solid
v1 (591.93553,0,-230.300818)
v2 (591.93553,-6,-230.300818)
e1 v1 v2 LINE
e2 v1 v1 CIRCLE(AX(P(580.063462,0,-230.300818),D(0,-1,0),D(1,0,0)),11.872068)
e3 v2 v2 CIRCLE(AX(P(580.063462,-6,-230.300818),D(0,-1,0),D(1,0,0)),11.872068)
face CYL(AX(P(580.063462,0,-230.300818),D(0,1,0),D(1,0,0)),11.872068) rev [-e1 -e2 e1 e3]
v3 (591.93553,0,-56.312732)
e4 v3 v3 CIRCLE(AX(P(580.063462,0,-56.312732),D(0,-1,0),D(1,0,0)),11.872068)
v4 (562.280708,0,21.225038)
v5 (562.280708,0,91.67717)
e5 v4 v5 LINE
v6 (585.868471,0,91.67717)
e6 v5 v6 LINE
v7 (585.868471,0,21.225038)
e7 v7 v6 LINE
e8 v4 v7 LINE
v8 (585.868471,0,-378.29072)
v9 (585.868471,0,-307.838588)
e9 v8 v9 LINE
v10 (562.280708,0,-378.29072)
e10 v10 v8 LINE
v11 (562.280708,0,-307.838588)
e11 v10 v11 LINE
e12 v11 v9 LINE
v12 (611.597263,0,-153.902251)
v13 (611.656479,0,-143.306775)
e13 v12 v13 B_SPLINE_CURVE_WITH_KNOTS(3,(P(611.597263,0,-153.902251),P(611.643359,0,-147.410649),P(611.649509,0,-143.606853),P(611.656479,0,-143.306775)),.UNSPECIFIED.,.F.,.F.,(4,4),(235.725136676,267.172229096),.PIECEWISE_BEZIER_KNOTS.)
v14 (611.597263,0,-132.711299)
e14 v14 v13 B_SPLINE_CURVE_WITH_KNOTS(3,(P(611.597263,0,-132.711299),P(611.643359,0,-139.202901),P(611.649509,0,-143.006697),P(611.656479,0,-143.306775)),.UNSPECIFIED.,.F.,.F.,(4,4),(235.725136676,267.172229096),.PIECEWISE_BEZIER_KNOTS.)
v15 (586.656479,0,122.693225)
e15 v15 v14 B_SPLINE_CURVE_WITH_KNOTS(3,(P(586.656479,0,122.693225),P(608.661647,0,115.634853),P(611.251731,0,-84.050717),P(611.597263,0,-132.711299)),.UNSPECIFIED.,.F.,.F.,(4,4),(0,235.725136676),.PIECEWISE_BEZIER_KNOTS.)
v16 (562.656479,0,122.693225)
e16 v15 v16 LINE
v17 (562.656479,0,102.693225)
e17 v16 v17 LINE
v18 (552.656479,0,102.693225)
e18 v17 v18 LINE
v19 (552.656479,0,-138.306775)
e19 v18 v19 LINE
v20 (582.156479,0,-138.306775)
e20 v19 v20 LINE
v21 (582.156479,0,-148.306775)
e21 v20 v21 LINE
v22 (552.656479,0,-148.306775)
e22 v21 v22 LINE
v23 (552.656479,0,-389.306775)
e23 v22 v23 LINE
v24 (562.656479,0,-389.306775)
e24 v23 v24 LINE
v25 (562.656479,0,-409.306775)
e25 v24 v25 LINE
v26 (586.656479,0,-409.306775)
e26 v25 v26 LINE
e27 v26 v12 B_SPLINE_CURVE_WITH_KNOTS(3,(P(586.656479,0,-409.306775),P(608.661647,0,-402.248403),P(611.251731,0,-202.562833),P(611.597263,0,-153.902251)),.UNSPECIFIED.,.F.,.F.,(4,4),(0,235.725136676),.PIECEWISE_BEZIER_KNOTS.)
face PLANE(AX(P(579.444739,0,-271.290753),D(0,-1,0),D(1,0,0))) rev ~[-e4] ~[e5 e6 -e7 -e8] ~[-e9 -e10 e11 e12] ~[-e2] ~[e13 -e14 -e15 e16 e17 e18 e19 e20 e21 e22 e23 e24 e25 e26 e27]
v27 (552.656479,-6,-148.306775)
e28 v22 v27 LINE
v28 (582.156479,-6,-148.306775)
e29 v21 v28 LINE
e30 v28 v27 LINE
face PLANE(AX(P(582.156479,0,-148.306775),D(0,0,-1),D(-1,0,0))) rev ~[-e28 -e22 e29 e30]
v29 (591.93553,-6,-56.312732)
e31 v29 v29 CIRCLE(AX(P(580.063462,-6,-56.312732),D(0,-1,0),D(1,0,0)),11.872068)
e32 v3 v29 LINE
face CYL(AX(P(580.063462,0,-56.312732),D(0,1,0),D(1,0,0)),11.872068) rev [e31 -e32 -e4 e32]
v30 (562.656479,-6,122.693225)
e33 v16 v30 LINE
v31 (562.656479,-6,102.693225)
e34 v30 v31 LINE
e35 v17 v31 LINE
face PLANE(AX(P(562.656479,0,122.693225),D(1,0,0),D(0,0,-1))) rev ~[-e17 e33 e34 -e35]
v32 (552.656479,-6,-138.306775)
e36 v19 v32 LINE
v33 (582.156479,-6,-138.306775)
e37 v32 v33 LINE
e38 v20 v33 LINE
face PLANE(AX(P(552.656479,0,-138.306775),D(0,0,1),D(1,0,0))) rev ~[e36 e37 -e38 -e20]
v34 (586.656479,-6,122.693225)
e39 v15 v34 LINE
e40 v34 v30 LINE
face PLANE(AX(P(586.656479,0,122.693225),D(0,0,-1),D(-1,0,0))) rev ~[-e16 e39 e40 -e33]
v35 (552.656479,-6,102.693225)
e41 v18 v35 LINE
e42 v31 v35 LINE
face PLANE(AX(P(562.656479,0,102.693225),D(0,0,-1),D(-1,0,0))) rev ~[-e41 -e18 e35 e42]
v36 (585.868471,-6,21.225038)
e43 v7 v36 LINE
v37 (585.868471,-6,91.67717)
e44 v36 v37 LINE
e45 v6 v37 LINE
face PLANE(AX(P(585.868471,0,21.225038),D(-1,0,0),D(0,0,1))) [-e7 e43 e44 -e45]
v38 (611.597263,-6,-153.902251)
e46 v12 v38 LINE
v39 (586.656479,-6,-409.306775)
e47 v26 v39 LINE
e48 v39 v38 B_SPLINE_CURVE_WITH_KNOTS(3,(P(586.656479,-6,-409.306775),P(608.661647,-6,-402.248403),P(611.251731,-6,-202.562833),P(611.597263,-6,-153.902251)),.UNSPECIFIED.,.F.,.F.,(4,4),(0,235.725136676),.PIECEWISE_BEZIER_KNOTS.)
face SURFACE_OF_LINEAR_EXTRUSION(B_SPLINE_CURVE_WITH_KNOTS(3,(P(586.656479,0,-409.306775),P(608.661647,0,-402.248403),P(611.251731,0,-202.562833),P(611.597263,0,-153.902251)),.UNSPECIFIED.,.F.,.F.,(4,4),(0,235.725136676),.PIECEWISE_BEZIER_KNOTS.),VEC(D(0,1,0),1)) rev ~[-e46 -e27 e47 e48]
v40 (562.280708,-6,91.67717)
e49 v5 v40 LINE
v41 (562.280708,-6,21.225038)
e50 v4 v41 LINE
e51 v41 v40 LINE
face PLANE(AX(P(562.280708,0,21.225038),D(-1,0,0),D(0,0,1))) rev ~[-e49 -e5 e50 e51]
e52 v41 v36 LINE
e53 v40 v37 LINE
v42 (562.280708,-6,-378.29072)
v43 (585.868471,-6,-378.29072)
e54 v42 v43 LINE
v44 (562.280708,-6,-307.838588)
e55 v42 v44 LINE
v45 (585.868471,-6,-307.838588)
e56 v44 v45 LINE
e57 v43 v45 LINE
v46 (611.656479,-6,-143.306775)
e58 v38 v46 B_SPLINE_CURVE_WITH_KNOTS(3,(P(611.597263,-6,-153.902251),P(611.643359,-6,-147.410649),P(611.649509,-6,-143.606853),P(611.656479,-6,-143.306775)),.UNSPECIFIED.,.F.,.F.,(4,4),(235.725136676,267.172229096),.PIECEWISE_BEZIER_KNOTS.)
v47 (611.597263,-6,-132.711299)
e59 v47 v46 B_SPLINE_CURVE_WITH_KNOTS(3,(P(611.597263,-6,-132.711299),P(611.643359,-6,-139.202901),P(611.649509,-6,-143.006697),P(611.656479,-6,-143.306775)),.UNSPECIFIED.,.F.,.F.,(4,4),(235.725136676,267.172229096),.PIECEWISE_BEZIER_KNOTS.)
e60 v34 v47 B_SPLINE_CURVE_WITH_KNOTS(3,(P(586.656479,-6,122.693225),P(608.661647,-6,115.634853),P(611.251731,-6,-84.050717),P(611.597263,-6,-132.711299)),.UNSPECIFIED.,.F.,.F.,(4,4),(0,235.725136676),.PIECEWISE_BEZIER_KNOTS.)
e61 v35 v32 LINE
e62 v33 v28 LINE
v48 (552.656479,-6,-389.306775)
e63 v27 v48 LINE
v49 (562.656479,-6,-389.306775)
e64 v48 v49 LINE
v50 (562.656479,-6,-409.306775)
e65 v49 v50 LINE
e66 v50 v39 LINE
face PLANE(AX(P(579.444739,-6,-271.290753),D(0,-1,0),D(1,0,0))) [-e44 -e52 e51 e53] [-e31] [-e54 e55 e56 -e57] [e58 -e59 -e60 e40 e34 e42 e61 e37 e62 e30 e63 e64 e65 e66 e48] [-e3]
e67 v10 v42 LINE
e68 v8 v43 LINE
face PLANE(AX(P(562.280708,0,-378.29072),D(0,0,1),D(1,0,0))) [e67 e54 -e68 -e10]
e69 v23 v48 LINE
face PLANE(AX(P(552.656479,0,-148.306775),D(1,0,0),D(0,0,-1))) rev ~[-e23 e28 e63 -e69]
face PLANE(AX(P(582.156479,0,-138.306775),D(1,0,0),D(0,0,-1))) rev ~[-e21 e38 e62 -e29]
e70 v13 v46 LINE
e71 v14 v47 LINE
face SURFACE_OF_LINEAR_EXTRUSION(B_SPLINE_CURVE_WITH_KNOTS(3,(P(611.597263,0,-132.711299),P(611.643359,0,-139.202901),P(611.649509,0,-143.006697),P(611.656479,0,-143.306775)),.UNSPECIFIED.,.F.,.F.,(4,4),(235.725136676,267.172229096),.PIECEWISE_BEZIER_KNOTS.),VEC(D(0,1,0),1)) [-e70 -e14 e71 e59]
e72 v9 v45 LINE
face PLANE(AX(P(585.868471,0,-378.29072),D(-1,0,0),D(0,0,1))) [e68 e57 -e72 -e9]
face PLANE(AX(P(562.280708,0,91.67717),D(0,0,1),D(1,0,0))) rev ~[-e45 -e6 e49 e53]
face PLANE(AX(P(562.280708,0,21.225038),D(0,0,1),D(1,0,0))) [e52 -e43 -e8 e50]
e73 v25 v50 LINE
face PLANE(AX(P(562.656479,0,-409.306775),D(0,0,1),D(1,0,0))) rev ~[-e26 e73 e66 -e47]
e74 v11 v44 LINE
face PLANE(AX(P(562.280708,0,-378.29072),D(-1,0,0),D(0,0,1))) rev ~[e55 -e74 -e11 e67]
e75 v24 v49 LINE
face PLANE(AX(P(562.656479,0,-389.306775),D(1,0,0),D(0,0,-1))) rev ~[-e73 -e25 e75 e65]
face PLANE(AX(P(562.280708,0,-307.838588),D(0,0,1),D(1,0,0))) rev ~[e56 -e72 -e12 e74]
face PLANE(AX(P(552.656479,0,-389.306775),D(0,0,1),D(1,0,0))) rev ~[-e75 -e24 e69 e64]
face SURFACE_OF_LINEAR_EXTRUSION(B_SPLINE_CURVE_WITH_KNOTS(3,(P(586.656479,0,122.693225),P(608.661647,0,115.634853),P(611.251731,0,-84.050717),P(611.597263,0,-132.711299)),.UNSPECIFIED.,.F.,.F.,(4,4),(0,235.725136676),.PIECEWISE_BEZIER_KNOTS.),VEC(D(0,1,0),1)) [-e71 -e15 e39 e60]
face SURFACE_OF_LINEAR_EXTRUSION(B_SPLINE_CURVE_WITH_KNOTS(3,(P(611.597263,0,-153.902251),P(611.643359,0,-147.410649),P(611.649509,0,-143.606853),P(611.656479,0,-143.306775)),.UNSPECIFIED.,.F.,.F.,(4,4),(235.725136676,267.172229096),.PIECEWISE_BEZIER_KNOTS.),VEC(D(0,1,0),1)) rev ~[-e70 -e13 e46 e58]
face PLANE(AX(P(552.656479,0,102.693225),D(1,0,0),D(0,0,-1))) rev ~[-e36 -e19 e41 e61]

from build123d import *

# Parameters (mm, degrees)
F0_W     = 23.5877633095
F0_H     = 70.452131331
F0_R     = 11.8720680475
F1_DEPTH = 6


# Not quite as in the source:
# - a feature names something its author has since deleted; it is built from what else it names


with BuildPart() as f1:
    # F0 (on Front) → F1 (new body)
    with BuildSketch(Plane.XZ):
        with BuildLine():
            add(Edge.make_bspline(
                [(611.5972634537, -153.9022508941), (611.6433594367, -147.41064865), (611.6495089066, -143.6068529658), (611.6564787513, -143.3067750725)],
                knots=[235.725136676, 235.725136676, 235.725136676, 235.725136676, 267.1722290958, 267.1722290958, 267.1722290958, 267.1722290958], degree=3))
            Line((611.6564787513, -143.3067750725), (582.1564787513, -143.3067750725))
            Line((582.1564787513, -143.3067750725), (582.1564787513, -148.3067750725))
            Line((582.1564787513, -148.3067750725), (552.6564787513, -148.3067750725))
            Line((552.6564787513, -148.3067750725), (552.6564787513, -389.3067750725))
            Line((552.6564787513, -389.3067750725), (562.6564787513, -389.3067750725))
            Line((562.6564787513, -389.3067750725), (562.6564787513, -409.3067750725))
            Line((562.6564787513, -409.3067750725), (586.6564787513, -409.3067750725))
            add(Edge.make_bspline(
                [(586.6564787513, -409.3067750725), (608.6616471129, -402.2484026518), (611.2517312901, -202.5628331126), (611.5972634537, -153.9022508941)],
                knots=[0, 0, 0, 0, 235.725136676, 235.725136676, 235.725136676, 235.725136676], degree=3))
        make_face()
        with Locations((574.0745894078, -343.064654055)):
            Rectangle(F0_W, F0_H, mode=Mode.SUBTRACT)
        with Locations((580.0634622574, -230.3008177464)):
            Circle(F0_R, mode=Mode.SUBTRACT)
        with BuildLine():
            add(Edge.make_bspline(
                [(586.6564787513, 122.6932249275), (608.6616471129, 115.6348525069), (611.2517312901, -84.0507170322), (611.5972634537, -132.7112992508)],
                knots=[0, 0, 0, 0, 235.725136676, 235.725136676, 235.725136676, 235.725136676], degree=3))
            Line((586.6564787513, 122.6932249275), (562.6564787513, 122.6932249275))
            Line((562.6564787513, 122.6932249275), (562.6564787513, 102.6932249275))
            Line((562.6564787513, 102.6932249275), (552.6564787513, 102.6932249275))
            Line((552.6564787513, 102.6932249275), (552.6564787513, -138.3067750725))
            Line((552.6564787513, -138.3067750725), (582.1564787513, -138.3067750725))
            Line((582.1564787513, -138.3067750725), (582.1564787513, -143.3067750725))
            Line((582.1564787513, -143.3067750725), (611.6564787513, -143.3067750725))
            add(Edge.make_bspline(
                [(611.5972634537, -132.7112992508), (611.6433594367, -139.2029014949), (611.6495089066, -143.0066971792), (611.6564787513, -143.3067750725)],
                knots=[235.725136676, 235.725136676, 235.725136676, 235.725136676, 267.1722290958, 267.1722290958, 267.1722290958, 267.1722290958], degree=3))
        make_face()
        with Locations((580.0634622574, -56.3127323985)):
            Circle(F0_R, mode=Mode.SUBTRACT)
        with Locations((574.0745894078, 56.4511039101)):
            Rectangle(F0_W, F0_H, mode=Mode.SUBTRACT)
    extrude(amount=F1_DEPTH)


solid = f1.part
